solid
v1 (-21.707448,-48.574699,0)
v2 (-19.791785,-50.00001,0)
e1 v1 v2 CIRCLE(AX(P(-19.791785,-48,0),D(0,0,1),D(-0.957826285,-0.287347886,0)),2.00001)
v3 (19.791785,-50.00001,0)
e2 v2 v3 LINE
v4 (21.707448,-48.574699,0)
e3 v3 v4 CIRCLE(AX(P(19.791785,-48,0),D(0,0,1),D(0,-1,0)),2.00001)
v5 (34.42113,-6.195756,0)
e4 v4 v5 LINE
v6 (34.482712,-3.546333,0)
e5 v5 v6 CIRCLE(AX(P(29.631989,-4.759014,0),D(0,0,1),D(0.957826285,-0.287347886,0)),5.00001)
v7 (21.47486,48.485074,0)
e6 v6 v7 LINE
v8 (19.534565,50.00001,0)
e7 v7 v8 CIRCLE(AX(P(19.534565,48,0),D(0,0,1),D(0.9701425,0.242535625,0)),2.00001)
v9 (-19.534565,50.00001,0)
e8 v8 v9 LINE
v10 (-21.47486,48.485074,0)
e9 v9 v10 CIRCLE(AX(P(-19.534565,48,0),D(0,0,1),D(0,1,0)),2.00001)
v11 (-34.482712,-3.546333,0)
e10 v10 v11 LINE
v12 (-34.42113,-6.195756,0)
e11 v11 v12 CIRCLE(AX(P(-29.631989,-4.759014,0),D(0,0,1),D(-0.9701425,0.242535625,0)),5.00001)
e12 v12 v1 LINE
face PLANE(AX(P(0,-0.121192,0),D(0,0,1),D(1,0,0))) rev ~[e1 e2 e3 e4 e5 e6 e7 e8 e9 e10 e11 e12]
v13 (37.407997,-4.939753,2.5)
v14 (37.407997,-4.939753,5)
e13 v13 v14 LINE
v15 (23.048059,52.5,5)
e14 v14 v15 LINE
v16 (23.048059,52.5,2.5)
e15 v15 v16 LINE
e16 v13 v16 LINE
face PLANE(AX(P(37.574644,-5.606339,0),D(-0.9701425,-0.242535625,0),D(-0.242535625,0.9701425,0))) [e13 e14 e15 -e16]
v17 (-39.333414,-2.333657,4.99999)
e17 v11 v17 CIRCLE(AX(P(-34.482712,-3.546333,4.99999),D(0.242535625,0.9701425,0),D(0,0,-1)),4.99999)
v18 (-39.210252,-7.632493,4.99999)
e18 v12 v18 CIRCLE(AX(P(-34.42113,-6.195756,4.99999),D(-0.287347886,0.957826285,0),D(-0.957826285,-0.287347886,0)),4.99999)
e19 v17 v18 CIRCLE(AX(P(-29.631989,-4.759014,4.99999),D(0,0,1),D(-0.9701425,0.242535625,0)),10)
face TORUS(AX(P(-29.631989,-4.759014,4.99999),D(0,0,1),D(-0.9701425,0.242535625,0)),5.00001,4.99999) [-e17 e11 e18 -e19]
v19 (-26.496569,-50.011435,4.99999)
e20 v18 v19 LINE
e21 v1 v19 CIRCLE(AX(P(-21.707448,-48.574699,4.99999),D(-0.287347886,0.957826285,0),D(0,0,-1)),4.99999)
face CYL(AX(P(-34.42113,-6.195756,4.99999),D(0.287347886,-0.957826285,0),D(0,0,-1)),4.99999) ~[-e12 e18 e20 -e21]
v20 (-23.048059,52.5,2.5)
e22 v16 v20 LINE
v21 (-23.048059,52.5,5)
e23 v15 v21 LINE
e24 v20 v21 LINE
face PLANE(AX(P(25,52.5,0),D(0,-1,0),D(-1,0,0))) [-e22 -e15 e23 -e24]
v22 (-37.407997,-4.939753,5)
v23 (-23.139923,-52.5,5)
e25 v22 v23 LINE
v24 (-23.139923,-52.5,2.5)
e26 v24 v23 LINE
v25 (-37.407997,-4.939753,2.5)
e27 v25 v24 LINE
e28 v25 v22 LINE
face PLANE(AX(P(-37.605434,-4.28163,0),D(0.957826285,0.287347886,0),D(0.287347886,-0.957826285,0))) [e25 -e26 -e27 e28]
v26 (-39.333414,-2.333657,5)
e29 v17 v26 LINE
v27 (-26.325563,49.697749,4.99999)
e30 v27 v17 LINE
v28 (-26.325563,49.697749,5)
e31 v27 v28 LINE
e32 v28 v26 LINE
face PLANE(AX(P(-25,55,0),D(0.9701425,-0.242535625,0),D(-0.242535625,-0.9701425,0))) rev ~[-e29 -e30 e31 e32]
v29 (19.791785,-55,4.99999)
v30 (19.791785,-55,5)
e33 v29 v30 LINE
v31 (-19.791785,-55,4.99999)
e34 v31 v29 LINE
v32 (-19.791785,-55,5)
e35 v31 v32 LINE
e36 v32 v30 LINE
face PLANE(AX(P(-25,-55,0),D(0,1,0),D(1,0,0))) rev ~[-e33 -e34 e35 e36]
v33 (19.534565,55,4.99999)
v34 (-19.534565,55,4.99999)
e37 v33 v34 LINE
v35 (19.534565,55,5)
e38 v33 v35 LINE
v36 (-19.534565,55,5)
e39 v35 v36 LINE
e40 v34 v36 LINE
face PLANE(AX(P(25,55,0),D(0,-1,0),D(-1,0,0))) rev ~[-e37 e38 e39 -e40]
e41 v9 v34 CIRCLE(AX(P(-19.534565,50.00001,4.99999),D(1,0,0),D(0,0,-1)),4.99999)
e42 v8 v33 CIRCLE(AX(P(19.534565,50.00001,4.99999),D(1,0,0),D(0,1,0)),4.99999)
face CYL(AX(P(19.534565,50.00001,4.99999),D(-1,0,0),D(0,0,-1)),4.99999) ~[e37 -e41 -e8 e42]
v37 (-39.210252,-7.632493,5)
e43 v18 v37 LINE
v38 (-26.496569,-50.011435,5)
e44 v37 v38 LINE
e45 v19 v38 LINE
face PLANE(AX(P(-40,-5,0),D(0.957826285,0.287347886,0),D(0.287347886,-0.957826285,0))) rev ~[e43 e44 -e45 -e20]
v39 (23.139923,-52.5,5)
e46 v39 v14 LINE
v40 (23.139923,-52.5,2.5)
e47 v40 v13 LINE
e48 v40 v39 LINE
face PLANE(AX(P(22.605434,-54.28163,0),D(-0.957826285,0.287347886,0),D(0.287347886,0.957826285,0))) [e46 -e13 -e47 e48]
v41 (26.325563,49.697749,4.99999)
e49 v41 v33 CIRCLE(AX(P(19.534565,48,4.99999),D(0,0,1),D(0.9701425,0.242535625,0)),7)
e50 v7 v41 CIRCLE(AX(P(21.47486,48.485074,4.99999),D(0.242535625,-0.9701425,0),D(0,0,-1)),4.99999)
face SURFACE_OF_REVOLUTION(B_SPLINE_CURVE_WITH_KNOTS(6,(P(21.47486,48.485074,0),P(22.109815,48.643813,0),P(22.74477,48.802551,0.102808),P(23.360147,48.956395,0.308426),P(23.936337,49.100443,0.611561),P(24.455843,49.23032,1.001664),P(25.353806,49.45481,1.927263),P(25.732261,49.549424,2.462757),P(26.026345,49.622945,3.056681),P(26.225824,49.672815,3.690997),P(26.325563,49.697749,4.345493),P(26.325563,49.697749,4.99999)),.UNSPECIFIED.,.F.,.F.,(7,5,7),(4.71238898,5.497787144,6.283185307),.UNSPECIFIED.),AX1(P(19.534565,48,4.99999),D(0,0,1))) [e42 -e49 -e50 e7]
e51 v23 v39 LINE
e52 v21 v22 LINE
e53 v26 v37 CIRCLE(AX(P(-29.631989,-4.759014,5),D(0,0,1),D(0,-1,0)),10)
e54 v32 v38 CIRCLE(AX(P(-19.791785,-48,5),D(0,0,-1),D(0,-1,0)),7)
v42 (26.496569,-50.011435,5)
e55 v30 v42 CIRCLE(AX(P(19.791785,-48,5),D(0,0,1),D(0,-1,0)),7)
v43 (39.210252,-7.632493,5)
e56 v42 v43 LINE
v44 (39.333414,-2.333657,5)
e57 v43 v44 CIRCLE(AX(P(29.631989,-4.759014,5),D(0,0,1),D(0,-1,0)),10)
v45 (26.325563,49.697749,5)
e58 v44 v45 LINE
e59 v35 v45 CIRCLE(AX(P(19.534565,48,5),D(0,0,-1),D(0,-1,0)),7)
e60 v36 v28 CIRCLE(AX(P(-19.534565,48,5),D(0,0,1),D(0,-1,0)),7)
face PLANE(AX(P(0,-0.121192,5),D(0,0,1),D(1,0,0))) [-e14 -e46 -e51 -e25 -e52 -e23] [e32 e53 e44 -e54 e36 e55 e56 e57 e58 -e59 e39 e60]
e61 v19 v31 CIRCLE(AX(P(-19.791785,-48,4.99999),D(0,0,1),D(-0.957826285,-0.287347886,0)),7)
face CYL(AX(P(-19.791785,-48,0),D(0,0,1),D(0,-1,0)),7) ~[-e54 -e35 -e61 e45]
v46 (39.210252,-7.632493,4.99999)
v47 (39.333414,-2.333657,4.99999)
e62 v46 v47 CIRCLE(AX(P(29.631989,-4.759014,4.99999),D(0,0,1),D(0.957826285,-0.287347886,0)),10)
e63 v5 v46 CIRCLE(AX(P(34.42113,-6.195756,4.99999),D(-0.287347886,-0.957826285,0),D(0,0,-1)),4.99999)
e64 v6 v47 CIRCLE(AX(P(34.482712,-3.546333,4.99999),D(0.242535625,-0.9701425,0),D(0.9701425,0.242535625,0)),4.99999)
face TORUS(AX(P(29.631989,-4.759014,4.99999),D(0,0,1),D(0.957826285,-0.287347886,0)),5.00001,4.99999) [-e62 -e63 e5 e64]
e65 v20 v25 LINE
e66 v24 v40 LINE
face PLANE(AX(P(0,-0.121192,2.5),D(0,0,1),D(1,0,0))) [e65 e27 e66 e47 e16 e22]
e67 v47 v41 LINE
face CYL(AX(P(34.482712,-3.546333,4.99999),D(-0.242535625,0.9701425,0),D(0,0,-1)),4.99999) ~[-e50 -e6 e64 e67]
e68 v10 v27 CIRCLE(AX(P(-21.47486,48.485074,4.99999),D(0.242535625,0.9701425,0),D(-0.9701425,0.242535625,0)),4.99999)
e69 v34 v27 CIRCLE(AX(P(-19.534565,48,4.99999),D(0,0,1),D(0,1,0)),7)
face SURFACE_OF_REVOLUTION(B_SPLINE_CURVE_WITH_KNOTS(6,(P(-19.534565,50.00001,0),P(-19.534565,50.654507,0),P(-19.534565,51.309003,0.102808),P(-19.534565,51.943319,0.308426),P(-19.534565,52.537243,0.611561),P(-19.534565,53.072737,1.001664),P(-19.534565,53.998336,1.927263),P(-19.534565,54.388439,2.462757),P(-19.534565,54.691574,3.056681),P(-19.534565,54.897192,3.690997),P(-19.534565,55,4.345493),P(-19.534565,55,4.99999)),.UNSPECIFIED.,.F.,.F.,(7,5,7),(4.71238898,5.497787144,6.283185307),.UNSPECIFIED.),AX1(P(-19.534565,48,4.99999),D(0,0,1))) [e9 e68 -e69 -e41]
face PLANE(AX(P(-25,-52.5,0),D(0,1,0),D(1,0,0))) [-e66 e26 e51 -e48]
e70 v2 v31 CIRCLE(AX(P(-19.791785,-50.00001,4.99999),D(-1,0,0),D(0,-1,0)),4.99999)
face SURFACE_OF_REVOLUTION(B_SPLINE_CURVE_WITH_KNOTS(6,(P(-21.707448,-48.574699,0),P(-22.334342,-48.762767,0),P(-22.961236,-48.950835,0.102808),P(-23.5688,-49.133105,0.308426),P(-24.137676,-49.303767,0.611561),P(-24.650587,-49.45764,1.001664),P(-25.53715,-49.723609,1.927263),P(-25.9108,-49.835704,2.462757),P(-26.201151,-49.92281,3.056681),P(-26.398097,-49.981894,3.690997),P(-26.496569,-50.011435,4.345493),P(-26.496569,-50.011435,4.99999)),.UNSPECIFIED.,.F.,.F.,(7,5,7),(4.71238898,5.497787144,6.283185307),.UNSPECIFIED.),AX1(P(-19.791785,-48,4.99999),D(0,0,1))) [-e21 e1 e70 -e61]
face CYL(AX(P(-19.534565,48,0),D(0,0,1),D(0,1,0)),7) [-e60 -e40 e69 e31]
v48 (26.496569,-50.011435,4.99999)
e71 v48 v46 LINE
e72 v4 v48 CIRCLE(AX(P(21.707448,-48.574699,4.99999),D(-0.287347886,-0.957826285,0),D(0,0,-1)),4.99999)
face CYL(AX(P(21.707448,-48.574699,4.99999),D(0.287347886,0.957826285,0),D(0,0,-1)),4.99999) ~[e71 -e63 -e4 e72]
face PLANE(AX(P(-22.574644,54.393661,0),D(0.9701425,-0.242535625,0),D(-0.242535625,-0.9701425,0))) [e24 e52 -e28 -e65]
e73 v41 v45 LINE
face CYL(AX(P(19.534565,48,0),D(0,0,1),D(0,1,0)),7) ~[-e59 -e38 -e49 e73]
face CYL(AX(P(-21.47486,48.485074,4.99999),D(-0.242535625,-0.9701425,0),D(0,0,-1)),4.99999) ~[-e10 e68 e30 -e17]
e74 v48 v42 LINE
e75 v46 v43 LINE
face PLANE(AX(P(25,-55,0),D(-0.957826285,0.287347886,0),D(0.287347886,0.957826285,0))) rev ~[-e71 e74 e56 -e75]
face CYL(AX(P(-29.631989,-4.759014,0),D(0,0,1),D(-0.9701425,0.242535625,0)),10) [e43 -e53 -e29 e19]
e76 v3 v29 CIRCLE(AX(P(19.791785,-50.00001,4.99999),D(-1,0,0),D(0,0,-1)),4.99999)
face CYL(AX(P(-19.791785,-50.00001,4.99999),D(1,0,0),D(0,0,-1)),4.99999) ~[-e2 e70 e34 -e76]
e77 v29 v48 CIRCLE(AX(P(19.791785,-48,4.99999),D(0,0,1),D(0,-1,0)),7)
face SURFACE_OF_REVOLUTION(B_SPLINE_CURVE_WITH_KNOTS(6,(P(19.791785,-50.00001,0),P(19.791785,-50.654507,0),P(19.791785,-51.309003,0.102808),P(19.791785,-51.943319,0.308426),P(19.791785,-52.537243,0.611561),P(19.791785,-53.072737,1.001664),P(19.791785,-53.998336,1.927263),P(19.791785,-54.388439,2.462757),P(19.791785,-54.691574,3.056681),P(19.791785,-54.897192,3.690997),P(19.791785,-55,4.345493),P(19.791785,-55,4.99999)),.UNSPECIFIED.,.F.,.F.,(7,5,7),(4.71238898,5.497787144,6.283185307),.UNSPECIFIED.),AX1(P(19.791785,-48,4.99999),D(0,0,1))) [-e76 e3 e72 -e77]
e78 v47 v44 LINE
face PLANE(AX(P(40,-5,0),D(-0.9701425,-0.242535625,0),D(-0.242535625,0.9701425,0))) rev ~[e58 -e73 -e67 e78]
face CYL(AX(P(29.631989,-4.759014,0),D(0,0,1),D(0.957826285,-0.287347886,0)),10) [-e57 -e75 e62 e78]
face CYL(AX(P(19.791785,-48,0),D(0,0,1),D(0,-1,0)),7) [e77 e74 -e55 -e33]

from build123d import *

# Parameters (mm, degrees)
F1_DEPTH = 5
F2_T     = -2.5
F3_R     = 7
F4_R     = 7
F5_R     = 10
F6_R     = 10
F7_R     = 7
F8_R     = 7
F9_R     = 4.99999


# Not quite as in the source:
# - a fillet or chamfer is up to 0.001 mm smaller than in the source, because OpenCascade refuses the exact size


with BuildPart() as f1:
    # F0 (on Top) → F1 (new body)
    with BuildSketch(Plane.XY):
        Polygon((25, 55), (-25, 55), (-40, -5), (-25, -55), (25, -55), (40, -5), align=None)
    extrude(amount=F1_DEPTH)

    # F2
    f2_openings = [f1.faces().sort_by_distance(p)[0] for p in [
        (0, -0.384615, 5),
    ]]
    offset(amount=F2_T, openings=f2_openings)

    # F3
    f3_edges = [f1.edges().sort_by_distance(p)[0] for p in [
        (25, 55, 2.5),
    ]]
    fillet(f3_edges, radius=F3_R)

    # F4
    f4_edges = [f1.edges().sort_by_distance(p)[0] for p in [
        (-25, 55, 2.5),
    ]]
    fillet(f4_edges, radius=F4_R)

    # F5
    f5_edges = [f1.edges().sort_by_distance(p)[0] for p in [
        (-40, -5, 2.5),
    ]]
    fillet(f5_edges, radius=F5_R)

    # F6
    f6_edges = [f1.edges().sort_by_distance(p)[0] for p in [
        (40, -5, 2.5),
    ]]
    fillet(f6_edges, radius=F6_R)

    # F7
    f7_edges = [f1.edges().sort_by_distance(p)[0] for p in [
        (-25, -55, 2.5),
    ]]
    fillet(f7_edges, radius=F7_R)

    # F8
    f8_edges = [f1.edges().sort_by_distance(p)[0] for p in [
        (25, -55, 2.5),
    ]]
    fillet(f8_edges, radius=F8_R)

    # F9 (radius 5 in the source; OpenCascade refuses exactly that, so slightly less here)
    f9_edges = [f1.edges().sort_by_distance(p)[0] for p in [
        (32.853411, -28.821964, 0),
    ]]
    fillet(f9_edges, radius=F9_R)


solid = f1.part
